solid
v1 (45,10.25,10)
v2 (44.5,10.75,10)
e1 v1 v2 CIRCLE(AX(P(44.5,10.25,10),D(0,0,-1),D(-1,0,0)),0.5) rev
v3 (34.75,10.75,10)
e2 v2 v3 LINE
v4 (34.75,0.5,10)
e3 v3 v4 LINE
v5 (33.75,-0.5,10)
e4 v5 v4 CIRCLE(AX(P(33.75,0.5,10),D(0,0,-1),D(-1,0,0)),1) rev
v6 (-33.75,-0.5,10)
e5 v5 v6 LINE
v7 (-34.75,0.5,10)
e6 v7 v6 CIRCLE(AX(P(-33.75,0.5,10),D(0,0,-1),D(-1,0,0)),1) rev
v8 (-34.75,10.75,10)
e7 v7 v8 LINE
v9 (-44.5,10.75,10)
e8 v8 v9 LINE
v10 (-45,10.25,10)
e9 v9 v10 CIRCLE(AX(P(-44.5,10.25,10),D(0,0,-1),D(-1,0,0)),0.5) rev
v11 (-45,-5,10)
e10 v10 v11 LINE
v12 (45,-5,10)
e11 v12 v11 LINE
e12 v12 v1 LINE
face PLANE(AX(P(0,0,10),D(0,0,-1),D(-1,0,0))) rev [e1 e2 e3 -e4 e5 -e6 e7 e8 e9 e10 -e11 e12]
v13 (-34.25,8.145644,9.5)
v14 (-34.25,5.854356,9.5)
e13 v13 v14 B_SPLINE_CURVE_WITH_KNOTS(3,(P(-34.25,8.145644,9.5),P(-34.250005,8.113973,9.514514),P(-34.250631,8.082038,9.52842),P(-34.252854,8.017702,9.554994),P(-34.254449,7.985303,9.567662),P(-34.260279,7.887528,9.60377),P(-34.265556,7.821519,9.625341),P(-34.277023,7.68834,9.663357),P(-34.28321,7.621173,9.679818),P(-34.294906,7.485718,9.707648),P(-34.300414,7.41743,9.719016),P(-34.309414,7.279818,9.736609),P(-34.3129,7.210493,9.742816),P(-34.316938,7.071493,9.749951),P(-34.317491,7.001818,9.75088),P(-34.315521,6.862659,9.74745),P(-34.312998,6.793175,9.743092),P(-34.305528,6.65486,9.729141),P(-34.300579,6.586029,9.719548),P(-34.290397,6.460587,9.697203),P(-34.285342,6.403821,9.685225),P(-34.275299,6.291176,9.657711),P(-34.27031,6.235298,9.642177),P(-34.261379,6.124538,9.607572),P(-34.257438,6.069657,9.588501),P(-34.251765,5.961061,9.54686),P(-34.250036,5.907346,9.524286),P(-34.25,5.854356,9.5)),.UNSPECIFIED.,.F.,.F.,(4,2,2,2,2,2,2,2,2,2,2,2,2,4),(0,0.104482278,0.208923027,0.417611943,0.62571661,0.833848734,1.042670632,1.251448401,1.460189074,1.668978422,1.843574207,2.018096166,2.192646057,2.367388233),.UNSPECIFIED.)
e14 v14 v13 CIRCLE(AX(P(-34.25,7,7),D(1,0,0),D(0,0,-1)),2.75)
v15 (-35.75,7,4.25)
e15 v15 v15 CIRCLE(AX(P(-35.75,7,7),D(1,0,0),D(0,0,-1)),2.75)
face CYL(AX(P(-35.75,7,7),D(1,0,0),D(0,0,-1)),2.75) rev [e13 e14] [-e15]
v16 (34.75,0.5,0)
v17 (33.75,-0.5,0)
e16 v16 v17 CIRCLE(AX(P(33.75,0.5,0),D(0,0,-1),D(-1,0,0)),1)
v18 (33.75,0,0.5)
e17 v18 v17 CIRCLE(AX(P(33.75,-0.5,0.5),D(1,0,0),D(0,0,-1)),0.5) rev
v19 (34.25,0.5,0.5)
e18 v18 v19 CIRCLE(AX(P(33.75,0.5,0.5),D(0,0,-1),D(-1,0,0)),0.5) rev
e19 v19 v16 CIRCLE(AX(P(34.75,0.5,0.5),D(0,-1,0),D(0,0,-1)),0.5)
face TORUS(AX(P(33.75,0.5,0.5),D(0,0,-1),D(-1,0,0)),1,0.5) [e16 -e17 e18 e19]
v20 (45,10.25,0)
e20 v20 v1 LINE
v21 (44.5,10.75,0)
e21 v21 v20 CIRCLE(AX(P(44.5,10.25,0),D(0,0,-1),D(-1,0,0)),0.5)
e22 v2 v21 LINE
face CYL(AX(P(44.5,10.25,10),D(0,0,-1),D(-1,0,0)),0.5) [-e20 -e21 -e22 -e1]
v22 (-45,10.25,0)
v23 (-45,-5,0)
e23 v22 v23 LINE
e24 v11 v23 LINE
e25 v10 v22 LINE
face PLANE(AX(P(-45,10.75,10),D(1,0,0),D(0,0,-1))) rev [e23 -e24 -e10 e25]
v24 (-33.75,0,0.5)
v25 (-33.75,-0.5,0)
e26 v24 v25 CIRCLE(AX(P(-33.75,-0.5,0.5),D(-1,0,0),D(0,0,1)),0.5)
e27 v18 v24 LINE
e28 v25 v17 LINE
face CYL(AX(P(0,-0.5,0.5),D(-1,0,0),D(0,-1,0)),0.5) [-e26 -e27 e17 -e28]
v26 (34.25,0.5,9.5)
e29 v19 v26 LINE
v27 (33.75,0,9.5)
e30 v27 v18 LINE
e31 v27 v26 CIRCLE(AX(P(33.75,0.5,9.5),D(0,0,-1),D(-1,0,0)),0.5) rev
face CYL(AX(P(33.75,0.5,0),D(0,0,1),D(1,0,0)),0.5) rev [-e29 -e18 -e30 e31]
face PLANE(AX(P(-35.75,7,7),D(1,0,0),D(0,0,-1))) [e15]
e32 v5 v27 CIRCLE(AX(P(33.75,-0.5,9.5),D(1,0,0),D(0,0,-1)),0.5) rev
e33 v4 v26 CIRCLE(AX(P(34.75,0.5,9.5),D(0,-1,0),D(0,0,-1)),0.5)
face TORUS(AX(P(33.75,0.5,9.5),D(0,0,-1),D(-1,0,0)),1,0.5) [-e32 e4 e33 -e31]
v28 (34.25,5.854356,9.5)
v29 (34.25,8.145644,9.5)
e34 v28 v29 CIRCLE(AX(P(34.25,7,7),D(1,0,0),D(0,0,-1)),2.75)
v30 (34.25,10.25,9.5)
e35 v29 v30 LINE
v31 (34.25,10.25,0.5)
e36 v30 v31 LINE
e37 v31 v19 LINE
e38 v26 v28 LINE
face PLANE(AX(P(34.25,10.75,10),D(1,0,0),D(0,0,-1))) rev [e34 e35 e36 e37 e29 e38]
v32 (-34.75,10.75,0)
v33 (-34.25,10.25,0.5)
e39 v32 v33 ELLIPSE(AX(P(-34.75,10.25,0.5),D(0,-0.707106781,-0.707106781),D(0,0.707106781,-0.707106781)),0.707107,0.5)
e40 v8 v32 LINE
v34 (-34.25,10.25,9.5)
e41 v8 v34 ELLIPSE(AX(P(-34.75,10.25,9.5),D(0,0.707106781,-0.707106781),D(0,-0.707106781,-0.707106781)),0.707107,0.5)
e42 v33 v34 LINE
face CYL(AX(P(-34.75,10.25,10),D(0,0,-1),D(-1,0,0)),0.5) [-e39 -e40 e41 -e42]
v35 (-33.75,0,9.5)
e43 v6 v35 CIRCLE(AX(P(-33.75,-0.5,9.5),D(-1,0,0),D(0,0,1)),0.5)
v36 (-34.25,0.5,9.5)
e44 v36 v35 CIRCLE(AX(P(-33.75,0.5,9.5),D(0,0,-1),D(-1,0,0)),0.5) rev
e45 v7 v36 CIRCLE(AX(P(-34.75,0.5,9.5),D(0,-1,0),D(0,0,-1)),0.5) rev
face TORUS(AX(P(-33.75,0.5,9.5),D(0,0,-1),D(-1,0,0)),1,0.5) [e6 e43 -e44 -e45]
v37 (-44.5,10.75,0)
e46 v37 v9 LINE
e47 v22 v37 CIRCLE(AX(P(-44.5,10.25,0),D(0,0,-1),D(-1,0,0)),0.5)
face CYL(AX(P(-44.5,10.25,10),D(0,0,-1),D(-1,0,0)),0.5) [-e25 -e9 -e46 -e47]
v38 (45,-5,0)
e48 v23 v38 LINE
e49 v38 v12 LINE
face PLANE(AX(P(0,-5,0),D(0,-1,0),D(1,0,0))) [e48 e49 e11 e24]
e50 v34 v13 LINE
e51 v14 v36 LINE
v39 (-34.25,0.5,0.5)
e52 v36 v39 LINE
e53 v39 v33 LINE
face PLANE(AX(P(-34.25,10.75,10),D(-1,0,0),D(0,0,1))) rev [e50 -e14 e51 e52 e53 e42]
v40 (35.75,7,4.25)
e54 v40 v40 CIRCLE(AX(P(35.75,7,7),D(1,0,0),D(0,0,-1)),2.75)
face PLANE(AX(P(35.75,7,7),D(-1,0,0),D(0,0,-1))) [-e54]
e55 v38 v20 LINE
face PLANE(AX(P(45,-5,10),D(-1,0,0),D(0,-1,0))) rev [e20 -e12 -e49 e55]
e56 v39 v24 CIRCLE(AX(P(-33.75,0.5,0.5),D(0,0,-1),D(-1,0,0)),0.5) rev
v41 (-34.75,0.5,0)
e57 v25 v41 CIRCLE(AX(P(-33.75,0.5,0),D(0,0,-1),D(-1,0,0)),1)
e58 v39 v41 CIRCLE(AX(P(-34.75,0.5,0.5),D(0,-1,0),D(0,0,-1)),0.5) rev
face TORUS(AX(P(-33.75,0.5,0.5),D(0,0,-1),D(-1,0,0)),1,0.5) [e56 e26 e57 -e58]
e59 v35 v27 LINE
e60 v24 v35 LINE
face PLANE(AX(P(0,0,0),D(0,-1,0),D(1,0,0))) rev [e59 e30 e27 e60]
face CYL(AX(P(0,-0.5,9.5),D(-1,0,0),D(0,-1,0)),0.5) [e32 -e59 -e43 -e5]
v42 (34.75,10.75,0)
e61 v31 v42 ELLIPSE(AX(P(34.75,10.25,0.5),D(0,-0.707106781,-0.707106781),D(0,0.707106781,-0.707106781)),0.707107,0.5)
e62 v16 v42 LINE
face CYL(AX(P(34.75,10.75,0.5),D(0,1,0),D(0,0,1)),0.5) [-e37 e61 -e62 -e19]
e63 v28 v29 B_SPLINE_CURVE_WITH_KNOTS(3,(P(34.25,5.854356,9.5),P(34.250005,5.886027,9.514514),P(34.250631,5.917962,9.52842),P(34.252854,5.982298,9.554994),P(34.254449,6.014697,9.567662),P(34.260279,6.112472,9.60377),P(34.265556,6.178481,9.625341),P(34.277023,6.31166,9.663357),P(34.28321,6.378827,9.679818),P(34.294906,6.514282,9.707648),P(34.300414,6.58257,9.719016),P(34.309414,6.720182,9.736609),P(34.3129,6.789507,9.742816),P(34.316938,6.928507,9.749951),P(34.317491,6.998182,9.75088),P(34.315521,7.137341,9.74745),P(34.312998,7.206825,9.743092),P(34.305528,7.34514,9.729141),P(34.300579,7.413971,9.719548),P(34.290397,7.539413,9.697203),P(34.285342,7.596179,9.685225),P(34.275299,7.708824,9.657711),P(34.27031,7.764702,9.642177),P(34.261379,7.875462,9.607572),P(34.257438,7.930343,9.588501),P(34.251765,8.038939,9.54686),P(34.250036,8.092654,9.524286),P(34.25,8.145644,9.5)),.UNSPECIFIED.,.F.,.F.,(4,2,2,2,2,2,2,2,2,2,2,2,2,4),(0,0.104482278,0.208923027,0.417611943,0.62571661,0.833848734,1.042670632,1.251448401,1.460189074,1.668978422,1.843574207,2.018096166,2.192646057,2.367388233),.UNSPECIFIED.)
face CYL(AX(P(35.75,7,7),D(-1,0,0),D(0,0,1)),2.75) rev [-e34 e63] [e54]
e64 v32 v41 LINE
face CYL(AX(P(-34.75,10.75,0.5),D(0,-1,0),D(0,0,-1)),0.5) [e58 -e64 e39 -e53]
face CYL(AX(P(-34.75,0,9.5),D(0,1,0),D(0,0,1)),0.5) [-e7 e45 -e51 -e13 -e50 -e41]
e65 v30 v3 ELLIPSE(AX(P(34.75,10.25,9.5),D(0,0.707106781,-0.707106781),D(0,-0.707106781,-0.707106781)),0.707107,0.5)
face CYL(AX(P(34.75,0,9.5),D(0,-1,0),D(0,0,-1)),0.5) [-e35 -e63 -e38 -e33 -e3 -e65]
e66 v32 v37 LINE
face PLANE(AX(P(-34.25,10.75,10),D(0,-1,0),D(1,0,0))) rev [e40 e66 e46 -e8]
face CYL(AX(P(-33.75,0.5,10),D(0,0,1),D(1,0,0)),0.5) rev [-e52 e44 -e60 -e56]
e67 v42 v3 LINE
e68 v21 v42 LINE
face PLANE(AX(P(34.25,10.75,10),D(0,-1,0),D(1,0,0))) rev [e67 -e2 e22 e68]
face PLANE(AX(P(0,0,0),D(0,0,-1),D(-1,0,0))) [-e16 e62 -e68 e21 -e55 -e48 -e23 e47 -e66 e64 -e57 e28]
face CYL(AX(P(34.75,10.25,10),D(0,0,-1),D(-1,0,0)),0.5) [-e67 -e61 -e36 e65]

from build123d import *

# Parameters (mm, degrees)
ESQUISSE1_W             = 10.75
ESQUISSE1_H             = 10.75
BOSS_EXTRU_1_DEPTH      = 10
BOSS_EXTRU_1_2_DEPTH    = 10
ESQUISSE3_W             = 90
ESQUISSE3_H             = 10
BOSS_EXTRU_2_DEPTH      = 5
ESQUISSE4_R             = 2.75
ENL_V_MAT_EXTRU_1_DEPTH = 1.5
CONG_1_R                = 0.5


with BuildPart() as part:
    # Esquisse1 → Boss.-Extru.1 (new body)
    with BuildSketch(Plane.XY):
        with Locations((-39.625, 5.375)):
            Rectangle(ESQUISSE1_W, ESQUISSE1_H)
    extrude(amount=BOSS_EXTRU_1_DEPTH)



with BuildPart() as body_2:
    # Esquisse1 → Boss.-Extru.1 2 (new body)
    with BuildSketch(Plane.XY):
        with Locations((39.625, 5.375)):
            Rectangle(ESQUISSE1_W, ESQUISSE1_H)
    extrude(amount=BOSS_EXTRU_1_2_DEPTH)


with BuildPart() as part_1:
    add(part.part)

    add(body_2.part)  # Boss.-Extru.2 merges body 2
    # Esquisse3 → Boss.-Extru.2 (add)
    with BuildSketch(Plane.XZ):
        with Locations((0, 5)):
            Rectangle(ESQUISSE3_W, ESQUISSE3_H)
    extrude(amount=BOSS_EXTRU_2_DEPTH)

    # Esquisse4 → Enlèv. mat.-Extru.1 (cut)
    with BuildSketch(Plane(origin=(-34.25, 0, 0), x_dir=(0, 0, -1), z_dir=(1, 0, 0))):
        with Locations((-7, 7)):
            Circle(ESQUISSE4_R)
    enl_v_mat_extru_1 = extrude(amount=-ENL_V_MAT_EXTRU_1_DEPTH, mode=Mode.SUBTRACT)

    # Symétrie1: Enlèv. mat.-Extru.1 across plane
    add(enl_v_mat_extru_1.mirror(Plane(origin=(0, 0, 0), x_dir=(0, 0, 1), z_dir=(1, 0, 0))), mode=Mode.SUBTRACT)

    # Congé1
    # the kernel refuses this fillet: 0.5 mm, written as the material it adds along each edge
    with BuildSketch(Plane(origin=(34.25, 0, 0), x_dir=(-1, 0, 0), z_dir=(0, 0, 1)), Plane(origin=(-34.25, 0, 0), x_dir=(0, 1, 0), z_dir=(0, 0, 1))) as cong_1_piece_1:
        with BuildLine():
            CenterArc((CONG_1_R, -CONG_1_R), CONG_1_R, 90, 90)
            Line((0, -CONG_1_R), (0, 0))
            Line((0, 0), (CONG_1_R, 0))
        make_face()
    extrude(amount=10)
    # the kernel refuses this fillet: 0.5 mm, written as the material it takes off along each edge
    with BuildSketch(Plane(origin=(33.75, 0, 0), x_dir=(0, -1, 0), z_dir=(-1, 0, 0)), Plane(origin=(-33.75, 0, 10), x_dir=(0, -1, 0), z_dir=(1, 0, 0))) as cong_1_2_piece_1:
        with BuildLine():
            CenterArc((CONG_1_R, CONG_1_R), CONG_1_R, 180, 90)
            Line((0, CONG_1_R), (0, 0))
            Line((0, 0), (CONG_1_R, 0))
        make_face()
    extrude(amount=67.5, mode=Mode.SUBTRACT)
    with BuildSketch(Plane(origin=(34.25, 12, 0), x_dir=(1, 0, 0), z_dir=(0, -1, 0)), Plane(origin=(-34.25, 0.5, 10), x_dir=(0, 0, -1), z_dir=(0, 1, 0))) as cong_1_2_piece_2:
        with BuildLine():
            CenterArc((CONG_1_R, CONG_1_R), CONG_1_R, 180, 90)
            Line((0, CONG_1_R), (0, 0))
            Line((0, 0), (CONG_1_R, 0))
        make_face()
    extrude(amount=11.5, mode=Mode.SUBTRACT)
    with BuildSketch(Plane(origin=(34.25, 10.75, -1.25), x_dir=(1, 0, 0), z_dir=(0, 0, 1)), Plane(origin=(45, 10.75, -1.25), x_dir=(0, -1, 0), z_dir=(0, 0, 1)), Plane(origin=(-45, 10.75, -1.25), x_dir=(1, 0, 0), z_dir=(0, 0, 1))) as cong_1_2_piece_3:
        with BuildLine():
            CenterArc((CONG_1_R, -CONG_1_R), CONG_1_R, 90, 90)
            Line((0, -CONG_1_R), (0, 0))
            Line((0, 0), (CONG_1_R, 0))
        make_face()
    extrude(amount=12.5, mode=Mode.SUBTRACT)
    with BuildSketch(Plane(origin=(34.25, 12, 10), x_dir=(1, 0, 0), z_dir=(0, -1, 0)), Plane(origin=(-34.25, 0.5, 0), x_dir=(0, 0, 1), z_dir=(0, 1, 0))) as cong_1_2_piece_4:
        with BuildLine():
            CenterArc((CONG_1_R, -CONG_1_R), CONG_1_R, 90, 90)
            Line((0, -CONG_1_R), (0, 0))
            Line((0, 0), (CONG_1_R, 0))
        make_face()
    extrude(amount=11.5, mode=Mode.SUBTRACT)
    with BuildSketch(Plane(origin=(-34.25, 10.75, -1.25), x_dir=(-1, 0, 0), z_dir=(0, 0, 1))) as cong_1_2_piece_5:
        with BuildLine():
            CenterArc((CONG_1_R, CONG_1_R), CONG_1_R, 180, 90)
            Line((0, CONG_1_R), (0, 0))
            Line((0, 0), (CONG_1_R, 0))
        make_face()
    extrude(amount=12.5, mode=Mode.SUBTRACT)
    with BuildSketch(Plane(origin=(-33.75, 0.5, 0), x_dir=(-1, 0, 0), z_dir=(0, 1, 0))) as cong_1_2_piece_6:
        with BuildLine():
            CenterArc((0.5 + CONG_1_R, CONG_1_R), CONG_1_R, 180, 90)
            Line((0.5, CONG_1_R), (0.5, 0))
            Line((0.5, 0), (0.5 + CONG_1_R, 0))
        make_face()
    revolve(axis=Axis((-33.75, 0.5, 0), (0, 0, 1)), revolution_arc=90, mode=Mode.SUBTRACT)
    with BuildSketch(Plane(origin=(-33.75, 0.5, 10), x_dir=(-1, 0, 0), z_dir=(0, 1, 0))) as cong_1_2_piece_7:
        with BuildLine():
            CenterArc((0.5 + CONG_1_R, -CONG_1_R), CONG_1_R, 90, 90)
            Line((0.5, -CONG_1_R), (0.5, 0))
            Line((0.5, 0), (0.5 + CONG_1_R, 0))
        make_face()
    revolve(axis=Axis((-33.75, 0.5, 10), (0, 0, 1)), revolution_arc=90, mode=Mode.SUBTRACT)
    with BuildSketch(Plane(origin=(33.75, 0.5, 10), x_dir=(0, -1, 0), z_dir=(-1, 0, 0))) as cong_1_2_piece_8:
        with BuildLine():
            CenterArc((0.5 + CONG_1_R, -CONG_1_R), CONG_1_R, 90, 90)
            Line((0.5, -CONG_1_R), (0.5, 0))
            Line((0.5, 0), (0.5 + CONG_1_R, 0))
        make_face()
    revolve(axis=Axis((33.75, 0.5, 10), (0, 0, 1)), revolution_arc=90, mode=Mode.SUBTRACT)
    with BuildSketch(Plane(origin=(33.75, 0.5, 0), x_dir=(0, -1, 0), z_dir=(-1, 0, 0))) as cong_1_2_piece_9:
        with BuildLine():
            CenterArc((0.5 + CONG_1_R, CONG_1_R), CONG_1_R, 180, 90)
            Line((0.5, CONG_1_R), (0.5, 0))
            Line((0.5, 0), (0.5 + CONG_1_R, 0))
        make_face()
    revolve(axis=Axis((33.75, 0.5, 0), (0, 0, 1)), revolution_arc=90, mode=Mode.SUBTRACT)


solid = part_1.part
